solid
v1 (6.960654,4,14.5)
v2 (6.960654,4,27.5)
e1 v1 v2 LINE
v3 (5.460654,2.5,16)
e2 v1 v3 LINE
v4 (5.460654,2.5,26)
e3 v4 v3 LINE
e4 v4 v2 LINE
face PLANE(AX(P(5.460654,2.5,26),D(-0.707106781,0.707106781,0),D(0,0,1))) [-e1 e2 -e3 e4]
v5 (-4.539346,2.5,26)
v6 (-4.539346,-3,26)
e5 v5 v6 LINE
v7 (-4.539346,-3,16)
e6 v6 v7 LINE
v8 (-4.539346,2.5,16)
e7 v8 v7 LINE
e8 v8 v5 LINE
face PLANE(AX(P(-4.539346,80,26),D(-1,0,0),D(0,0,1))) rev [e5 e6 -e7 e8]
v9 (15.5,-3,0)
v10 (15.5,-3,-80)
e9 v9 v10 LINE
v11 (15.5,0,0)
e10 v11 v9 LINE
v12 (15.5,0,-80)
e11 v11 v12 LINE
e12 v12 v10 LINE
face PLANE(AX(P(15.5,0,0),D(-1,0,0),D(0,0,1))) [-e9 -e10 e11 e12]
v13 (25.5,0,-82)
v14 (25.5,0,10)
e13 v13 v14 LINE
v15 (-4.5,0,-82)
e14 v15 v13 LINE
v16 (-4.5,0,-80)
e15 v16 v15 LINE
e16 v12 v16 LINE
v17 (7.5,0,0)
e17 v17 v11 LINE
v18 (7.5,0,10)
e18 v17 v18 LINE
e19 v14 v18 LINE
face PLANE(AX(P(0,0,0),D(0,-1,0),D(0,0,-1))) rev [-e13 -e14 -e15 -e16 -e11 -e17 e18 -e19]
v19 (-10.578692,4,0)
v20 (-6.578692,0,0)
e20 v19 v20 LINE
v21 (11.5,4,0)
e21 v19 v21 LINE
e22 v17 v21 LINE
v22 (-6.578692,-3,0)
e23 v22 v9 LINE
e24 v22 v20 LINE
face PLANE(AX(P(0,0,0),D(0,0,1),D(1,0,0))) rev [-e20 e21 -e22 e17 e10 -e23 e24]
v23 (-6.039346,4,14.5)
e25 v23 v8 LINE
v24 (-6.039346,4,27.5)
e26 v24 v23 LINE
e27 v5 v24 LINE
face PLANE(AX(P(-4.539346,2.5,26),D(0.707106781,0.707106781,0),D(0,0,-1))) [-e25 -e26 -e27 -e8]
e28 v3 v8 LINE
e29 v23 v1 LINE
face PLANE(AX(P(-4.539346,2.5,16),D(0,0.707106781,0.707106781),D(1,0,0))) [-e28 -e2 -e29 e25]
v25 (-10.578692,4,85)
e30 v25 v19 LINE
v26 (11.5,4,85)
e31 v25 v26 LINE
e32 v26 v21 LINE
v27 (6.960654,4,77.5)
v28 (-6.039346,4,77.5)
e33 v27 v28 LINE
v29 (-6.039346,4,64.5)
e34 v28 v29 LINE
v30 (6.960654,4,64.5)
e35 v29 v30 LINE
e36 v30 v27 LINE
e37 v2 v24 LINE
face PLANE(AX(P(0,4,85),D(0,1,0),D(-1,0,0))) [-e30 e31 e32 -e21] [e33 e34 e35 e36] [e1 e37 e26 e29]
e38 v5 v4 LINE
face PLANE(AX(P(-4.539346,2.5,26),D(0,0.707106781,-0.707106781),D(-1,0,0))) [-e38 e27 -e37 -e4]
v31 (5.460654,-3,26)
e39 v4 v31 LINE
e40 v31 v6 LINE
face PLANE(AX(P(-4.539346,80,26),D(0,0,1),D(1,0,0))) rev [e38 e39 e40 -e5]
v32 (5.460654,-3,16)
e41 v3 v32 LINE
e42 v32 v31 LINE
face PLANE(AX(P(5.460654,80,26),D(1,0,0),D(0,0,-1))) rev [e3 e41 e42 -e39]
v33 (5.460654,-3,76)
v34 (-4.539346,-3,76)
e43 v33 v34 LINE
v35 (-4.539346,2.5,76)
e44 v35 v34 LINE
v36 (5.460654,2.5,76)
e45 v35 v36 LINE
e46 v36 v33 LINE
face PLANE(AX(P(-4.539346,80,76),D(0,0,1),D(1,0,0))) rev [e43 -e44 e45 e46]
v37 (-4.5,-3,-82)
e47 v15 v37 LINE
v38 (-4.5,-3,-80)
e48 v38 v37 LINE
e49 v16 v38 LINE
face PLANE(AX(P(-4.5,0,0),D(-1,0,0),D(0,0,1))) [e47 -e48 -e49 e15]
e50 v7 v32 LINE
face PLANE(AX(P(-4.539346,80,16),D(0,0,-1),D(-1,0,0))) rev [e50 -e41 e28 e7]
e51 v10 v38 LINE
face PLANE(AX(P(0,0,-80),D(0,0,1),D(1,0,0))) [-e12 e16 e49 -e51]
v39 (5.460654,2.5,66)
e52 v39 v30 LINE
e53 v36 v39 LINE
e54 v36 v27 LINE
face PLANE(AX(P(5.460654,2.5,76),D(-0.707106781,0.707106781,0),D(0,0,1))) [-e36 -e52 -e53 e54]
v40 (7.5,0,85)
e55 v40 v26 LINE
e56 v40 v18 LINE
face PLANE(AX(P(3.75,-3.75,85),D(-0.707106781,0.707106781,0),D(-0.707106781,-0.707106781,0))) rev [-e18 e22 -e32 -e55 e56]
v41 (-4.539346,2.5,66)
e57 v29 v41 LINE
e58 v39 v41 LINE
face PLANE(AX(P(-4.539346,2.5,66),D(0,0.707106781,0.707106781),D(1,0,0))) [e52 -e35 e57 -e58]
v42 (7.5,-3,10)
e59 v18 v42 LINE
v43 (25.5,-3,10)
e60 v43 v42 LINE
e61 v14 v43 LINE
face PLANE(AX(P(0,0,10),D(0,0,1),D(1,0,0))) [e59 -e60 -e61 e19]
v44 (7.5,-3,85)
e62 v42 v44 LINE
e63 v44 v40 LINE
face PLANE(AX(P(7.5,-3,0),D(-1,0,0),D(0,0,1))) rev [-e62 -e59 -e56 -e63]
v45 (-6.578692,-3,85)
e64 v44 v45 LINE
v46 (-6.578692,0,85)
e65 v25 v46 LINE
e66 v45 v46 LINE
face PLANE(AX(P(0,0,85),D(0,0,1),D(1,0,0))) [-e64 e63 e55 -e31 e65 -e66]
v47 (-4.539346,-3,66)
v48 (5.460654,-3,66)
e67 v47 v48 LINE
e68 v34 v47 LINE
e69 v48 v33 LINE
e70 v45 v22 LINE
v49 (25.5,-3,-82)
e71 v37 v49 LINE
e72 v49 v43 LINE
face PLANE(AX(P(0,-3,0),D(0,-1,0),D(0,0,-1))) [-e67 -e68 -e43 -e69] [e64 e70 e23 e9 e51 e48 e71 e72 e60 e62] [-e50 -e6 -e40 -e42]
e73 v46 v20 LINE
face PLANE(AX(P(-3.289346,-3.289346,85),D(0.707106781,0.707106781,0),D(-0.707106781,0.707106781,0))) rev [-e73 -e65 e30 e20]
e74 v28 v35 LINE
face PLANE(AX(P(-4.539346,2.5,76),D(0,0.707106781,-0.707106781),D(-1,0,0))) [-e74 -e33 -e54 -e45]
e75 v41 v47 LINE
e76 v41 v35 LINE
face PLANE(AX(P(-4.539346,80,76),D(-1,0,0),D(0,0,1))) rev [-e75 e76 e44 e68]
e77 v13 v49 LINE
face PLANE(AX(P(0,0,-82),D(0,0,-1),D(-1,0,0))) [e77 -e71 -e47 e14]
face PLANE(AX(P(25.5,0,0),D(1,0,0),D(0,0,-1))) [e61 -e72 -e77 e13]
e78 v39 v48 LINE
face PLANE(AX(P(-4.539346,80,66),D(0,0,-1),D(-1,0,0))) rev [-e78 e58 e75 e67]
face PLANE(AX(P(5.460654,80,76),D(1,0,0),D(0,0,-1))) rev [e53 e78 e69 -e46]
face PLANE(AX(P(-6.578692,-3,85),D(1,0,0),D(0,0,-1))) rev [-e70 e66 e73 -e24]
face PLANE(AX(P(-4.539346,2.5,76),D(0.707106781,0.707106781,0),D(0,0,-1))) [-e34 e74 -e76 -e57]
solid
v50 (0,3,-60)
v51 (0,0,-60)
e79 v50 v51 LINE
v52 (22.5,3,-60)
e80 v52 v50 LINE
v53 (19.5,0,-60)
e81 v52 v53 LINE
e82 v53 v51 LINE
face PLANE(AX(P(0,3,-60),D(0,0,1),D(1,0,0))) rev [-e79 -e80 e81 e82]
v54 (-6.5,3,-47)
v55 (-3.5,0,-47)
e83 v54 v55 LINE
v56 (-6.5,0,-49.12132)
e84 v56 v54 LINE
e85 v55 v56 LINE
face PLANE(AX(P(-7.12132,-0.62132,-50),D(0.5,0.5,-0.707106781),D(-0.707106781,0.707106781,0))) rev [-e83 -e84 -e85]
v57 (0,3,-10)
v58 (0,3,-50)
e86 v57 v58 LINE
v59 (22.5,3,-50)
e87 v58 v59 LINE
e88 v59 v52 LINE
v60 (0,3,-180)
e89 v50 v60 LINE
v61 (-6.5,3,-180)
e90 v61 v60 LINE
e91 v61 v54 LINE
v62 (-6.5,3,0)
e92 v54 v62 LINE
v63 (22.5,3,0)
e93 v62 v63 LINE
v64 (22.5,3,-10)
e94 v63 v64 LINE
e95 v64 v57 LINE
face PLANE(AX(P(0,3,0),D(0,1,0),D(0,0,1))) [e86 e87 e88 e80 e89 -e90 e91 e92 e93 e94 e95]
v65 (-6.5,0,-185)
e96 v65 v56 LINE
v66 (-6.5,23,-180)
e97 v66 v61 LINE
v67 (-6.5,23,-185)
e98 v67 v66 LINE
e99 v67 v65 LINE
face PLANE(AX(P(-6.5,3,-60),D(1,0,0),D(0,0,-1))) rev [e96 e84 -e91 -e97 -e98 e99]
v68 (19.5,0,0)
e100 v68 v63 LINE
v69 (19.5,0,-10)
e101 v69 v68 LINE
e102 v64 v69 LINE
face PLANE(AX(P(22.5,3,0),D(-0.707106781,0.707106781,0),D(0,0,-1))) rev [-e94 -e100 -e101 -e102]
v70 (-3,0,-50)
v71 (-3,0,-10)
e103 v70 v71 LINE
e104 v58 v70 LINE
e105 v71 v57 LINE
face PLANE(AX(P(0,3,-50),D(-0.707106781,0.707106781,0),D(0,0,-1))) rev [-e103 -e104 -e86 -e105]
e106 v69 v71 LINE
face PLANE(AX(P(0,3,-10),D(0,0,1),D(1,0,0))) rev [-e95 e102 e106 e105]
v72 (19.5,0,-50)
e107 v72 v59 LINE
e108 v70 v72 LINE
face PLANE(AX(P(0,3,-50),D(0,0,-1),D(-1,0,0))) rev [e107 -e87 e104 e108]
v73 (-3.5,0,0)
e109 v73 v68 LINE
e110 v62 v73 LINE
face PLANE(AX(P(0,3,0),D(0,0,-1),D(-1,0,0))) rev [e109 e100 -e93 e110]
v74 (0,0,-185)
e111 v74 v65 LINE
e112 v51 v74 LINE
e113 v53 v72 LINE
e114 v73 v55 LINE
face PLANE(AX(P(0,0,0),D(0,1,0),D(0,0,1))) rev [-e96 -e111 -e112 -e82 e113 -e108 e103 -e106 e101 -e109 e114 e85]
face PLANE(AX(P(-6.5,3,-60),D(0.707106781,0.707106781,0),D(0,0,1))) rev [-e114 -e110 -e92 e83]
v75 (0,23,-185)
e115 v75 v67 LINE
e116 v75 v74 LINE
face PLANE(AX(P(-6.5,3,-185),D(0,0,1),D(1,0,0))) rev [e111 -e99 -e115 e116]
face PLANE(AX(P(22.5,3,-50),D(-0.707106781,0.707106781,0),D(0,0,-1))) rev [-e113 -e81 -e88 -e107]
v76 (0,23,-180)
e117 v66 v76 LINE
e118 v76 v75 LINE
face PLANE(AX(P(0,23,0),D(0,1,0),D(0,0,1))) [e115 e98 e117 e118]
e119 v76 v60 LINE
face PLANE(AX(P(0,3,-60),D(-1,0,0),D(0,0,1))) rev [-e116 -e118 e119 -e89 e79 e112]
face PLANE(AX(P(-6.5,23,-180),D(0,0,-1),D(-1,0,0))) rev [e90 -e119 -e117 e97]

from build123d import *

# Parameters (mm, degrees)
DODANIE_WYCI_GNI_CIE4_DEPTH = 3
SFAZOWANIE2_SIZE            = 3
SZKIC7_W                    = 6.5
SZKIC7_H                    = 5
DODANIE_WYCI_GNI_CIE5_DEPTH = 20
SFAZOWANIE3_START           = -50
SFAZOWANIE3_DEPTH           = 51
SFAZOWANIE4_SIZE            = 3
DODANIE_WYCI_GNI_CIE1_DEPTH = 85
SZKIC2_W                    = 10
SZKIC2_H                    = 10
WYTNIJ_WYCI_GNI_CIE1_DEPTH  = 80
SFAZOWANIE1_SIZE            = 1.5
SZKIC3_W                    = 14.078691808
SZKIC3_H                    = 85
SZKIC3_W_2                  = 10
SZKIC3_H_2                  = 10
DODANIE_WYCI_GNI_CIE2_DEPTH = 3
DODANIE_WYCI_GNI_CIE3_DEPTH = 3


with BuildPart() as part:
    # Szkic6 → Dodanie-wyciągnięcie4 (new body)
    with BuildSketch(Plane(origin=(0, 0, 0), x_dir=(1, 0, 0), z_dir=(0, 1, 0))):
        Polygon((0, 50), (22.5, 50), (22.5, 60), (0, 60), (0, 185), (-6.5, 185), (-6.5, 60), (-6.5, 0), (0, 0), (22.5, 0), (22.5, 10), (0, 10), align=None)
    extrude(amount=DODANIE_WYCI_GNI_CIE4_DEPTH)

    # Sfazowanie2
    sfazowanie2_edges = [part.edges().sort_by_distance(p)[0] for p in [
        (0, 0, -30),
        (22.5, 0, -55),
        (22.5, 0, -5),
    ]]
    chamfer(sfazowanie2_edges, length=SFAZOWANIE2_SIZE - 0.0001)  # a hair under: the kernel refuses the full size

    # Szkic7 → Dodanie-wyciągnięcie5 (add)
    with BuildSketch(Plane(origin=(0, 3, 0), x_dir=(1, 0, 0), z_dir=(0, 1, 0))):
        with Locations((-3.25, 182.5)):
            Rectangle(SZKIC7_W, SZKIC7_H)
    extrude(amount=DODANIE_WYCI_GNI_CIE5_DEPTH)

    # Sfazowanie3: read off the stored shape, not the designer's step
    # Sfazowanie3 outline → Sfazowanie3 (cut)
    with BuildSketch(Plane.XY.offset(SFAZOWANIE3_START)):
        Polygon((-6.5, 0), (-3.5, 0), (-6.5, 3), align=None)
    extrude(amount=SFAZOWANIE3_DEPTH, mode=Mode.SUBTRACT)

    # Sfazowanie4
    # the kernel refuses this chamfer: 3 mm, written as the material it adds along each edge
    with BuildSketch(Plane(origin=(1.95536344, -5.45536344, -50), x_dir=(0, 0, 1), z_dir=(-0.7071067811865476, 0.7071067811865476, 0))) as sfazowanie4_piece_1_section:
        Polygon((SFAZOWANIE4_SIZE, 0), (0, -SFAZOWANIE4_SIZE), (0, 0), align=None)
    sfazowanie4_piece_1 = extrude(amount=19.672738615, mode=Mode.PRIVATE)
    sfazowanie4_piece_1 = split(sfazowanie4_piece_1, bisect_by=Plane(origin=(1.95536344, 3, -50), z_dir=(0, -1, 0)), keep=Keep.TOP, mode=Mode.PRIVATE)
    sfazowanie4_piece_1 = split(sfazowanie4_piece_1, bisect_by=Plane(origin=(1.95536344, 0, -50), z_dir=(0, 1, 0)), keep=Keep.TOP, mode=Mode.PRIVATE)
    sfazowanie4_piece_1 = split(sfazowanie4_piece_1, bisect_by=Plane(origin=(-6.5, -5.45536344, -50), z_dir=(1, 0, 0)), keep=Keep.TOP, mode=Mode.PRIVATE)
    add(sfazowanie4_piece_1)


with BuildPart() as body_2:
    # Szkic1 → Dodanie-wyciągnięcie1 (new body)
    with BuildSketch(Plane.XY):
        Polygon((7.5, 0), (11.5, 4), (-10.578691808, 4), (-6.578691808, 0), align=None)
    extrude(amount=DODANIE_WYCI_GNI_CIE1_DEPTH)

    # Szkic2 → Wytnij-wyciągnięcie1 (cut)
    with BuildSketch(Plane.XZ):
        with Locations((0.460654096, 21)):
            Rectangle(SZKIC2_W, SZKIC2_H)
        with Locations((0.460654096, 71)):
            Rectangle(SZKIC2_W, SZKIC2_H)
    extrude(amount=-WYTNIJ_WYCI_GNI_CIE1_DEPTH, mode=Mode.SUBTRACT)

    # Sfazowanie1
    sfazowanie1_edges = [body_2.edges().sort_by_distance(p)[0] for p in [
        (0.460654096, 4, 76),
        (-4.539345904, 4, 71),
        (0.460654096, 4, 66),
        (5.460654096, 4, 71),
        (0.460654096, 4, 26),
        (-4.539345904, 4, 21),
        (0.460654096, 4, 16),
        (5.460654096, 4, 21),
    ]]
    chamfer(sfazowanie1_edges, length=SFAZOWANIE1_SIZE)

    # Szkic3 → Dodanie-wyciągnięcie2 (add)
    with BuildSketch(Plane.XZ):
        with Locations((0.460654096, 42.5)):
            Rectangle(SZKIC3_W, SZKIC3_H)
        with Locations((0.460654096, 21)):
            Rectangle(SZKIC3_W_2, SZKIC3_H_2, mode=Mode.SUBTRACT)
        with Locations((0.460654096, 71)):
            Rectangle(SZKIC3_W_2, SZKIC3_H_2, mode=Mode.SUBTRACT)
    extrude(amount=DODANIE_WYCI_GNI_CIE2_DEPTH)

    # Szkic5 → Dodanie-wyciągnięcie3 (add)
    with BuildSketch(Plane.XZ.offset(3)):
        Polygon((7.5, 10), (7.5, 0), (15.5, 0), (15.5, -80), (-4.5, -80), (-4.5, -82), (25.5, -82), (25.5, 10), align=None)
    extrude(amount=-DODANIE_WYCI_GNI_CIE3_DEPTH)


solid = Compound([part.part, body_2.part])
